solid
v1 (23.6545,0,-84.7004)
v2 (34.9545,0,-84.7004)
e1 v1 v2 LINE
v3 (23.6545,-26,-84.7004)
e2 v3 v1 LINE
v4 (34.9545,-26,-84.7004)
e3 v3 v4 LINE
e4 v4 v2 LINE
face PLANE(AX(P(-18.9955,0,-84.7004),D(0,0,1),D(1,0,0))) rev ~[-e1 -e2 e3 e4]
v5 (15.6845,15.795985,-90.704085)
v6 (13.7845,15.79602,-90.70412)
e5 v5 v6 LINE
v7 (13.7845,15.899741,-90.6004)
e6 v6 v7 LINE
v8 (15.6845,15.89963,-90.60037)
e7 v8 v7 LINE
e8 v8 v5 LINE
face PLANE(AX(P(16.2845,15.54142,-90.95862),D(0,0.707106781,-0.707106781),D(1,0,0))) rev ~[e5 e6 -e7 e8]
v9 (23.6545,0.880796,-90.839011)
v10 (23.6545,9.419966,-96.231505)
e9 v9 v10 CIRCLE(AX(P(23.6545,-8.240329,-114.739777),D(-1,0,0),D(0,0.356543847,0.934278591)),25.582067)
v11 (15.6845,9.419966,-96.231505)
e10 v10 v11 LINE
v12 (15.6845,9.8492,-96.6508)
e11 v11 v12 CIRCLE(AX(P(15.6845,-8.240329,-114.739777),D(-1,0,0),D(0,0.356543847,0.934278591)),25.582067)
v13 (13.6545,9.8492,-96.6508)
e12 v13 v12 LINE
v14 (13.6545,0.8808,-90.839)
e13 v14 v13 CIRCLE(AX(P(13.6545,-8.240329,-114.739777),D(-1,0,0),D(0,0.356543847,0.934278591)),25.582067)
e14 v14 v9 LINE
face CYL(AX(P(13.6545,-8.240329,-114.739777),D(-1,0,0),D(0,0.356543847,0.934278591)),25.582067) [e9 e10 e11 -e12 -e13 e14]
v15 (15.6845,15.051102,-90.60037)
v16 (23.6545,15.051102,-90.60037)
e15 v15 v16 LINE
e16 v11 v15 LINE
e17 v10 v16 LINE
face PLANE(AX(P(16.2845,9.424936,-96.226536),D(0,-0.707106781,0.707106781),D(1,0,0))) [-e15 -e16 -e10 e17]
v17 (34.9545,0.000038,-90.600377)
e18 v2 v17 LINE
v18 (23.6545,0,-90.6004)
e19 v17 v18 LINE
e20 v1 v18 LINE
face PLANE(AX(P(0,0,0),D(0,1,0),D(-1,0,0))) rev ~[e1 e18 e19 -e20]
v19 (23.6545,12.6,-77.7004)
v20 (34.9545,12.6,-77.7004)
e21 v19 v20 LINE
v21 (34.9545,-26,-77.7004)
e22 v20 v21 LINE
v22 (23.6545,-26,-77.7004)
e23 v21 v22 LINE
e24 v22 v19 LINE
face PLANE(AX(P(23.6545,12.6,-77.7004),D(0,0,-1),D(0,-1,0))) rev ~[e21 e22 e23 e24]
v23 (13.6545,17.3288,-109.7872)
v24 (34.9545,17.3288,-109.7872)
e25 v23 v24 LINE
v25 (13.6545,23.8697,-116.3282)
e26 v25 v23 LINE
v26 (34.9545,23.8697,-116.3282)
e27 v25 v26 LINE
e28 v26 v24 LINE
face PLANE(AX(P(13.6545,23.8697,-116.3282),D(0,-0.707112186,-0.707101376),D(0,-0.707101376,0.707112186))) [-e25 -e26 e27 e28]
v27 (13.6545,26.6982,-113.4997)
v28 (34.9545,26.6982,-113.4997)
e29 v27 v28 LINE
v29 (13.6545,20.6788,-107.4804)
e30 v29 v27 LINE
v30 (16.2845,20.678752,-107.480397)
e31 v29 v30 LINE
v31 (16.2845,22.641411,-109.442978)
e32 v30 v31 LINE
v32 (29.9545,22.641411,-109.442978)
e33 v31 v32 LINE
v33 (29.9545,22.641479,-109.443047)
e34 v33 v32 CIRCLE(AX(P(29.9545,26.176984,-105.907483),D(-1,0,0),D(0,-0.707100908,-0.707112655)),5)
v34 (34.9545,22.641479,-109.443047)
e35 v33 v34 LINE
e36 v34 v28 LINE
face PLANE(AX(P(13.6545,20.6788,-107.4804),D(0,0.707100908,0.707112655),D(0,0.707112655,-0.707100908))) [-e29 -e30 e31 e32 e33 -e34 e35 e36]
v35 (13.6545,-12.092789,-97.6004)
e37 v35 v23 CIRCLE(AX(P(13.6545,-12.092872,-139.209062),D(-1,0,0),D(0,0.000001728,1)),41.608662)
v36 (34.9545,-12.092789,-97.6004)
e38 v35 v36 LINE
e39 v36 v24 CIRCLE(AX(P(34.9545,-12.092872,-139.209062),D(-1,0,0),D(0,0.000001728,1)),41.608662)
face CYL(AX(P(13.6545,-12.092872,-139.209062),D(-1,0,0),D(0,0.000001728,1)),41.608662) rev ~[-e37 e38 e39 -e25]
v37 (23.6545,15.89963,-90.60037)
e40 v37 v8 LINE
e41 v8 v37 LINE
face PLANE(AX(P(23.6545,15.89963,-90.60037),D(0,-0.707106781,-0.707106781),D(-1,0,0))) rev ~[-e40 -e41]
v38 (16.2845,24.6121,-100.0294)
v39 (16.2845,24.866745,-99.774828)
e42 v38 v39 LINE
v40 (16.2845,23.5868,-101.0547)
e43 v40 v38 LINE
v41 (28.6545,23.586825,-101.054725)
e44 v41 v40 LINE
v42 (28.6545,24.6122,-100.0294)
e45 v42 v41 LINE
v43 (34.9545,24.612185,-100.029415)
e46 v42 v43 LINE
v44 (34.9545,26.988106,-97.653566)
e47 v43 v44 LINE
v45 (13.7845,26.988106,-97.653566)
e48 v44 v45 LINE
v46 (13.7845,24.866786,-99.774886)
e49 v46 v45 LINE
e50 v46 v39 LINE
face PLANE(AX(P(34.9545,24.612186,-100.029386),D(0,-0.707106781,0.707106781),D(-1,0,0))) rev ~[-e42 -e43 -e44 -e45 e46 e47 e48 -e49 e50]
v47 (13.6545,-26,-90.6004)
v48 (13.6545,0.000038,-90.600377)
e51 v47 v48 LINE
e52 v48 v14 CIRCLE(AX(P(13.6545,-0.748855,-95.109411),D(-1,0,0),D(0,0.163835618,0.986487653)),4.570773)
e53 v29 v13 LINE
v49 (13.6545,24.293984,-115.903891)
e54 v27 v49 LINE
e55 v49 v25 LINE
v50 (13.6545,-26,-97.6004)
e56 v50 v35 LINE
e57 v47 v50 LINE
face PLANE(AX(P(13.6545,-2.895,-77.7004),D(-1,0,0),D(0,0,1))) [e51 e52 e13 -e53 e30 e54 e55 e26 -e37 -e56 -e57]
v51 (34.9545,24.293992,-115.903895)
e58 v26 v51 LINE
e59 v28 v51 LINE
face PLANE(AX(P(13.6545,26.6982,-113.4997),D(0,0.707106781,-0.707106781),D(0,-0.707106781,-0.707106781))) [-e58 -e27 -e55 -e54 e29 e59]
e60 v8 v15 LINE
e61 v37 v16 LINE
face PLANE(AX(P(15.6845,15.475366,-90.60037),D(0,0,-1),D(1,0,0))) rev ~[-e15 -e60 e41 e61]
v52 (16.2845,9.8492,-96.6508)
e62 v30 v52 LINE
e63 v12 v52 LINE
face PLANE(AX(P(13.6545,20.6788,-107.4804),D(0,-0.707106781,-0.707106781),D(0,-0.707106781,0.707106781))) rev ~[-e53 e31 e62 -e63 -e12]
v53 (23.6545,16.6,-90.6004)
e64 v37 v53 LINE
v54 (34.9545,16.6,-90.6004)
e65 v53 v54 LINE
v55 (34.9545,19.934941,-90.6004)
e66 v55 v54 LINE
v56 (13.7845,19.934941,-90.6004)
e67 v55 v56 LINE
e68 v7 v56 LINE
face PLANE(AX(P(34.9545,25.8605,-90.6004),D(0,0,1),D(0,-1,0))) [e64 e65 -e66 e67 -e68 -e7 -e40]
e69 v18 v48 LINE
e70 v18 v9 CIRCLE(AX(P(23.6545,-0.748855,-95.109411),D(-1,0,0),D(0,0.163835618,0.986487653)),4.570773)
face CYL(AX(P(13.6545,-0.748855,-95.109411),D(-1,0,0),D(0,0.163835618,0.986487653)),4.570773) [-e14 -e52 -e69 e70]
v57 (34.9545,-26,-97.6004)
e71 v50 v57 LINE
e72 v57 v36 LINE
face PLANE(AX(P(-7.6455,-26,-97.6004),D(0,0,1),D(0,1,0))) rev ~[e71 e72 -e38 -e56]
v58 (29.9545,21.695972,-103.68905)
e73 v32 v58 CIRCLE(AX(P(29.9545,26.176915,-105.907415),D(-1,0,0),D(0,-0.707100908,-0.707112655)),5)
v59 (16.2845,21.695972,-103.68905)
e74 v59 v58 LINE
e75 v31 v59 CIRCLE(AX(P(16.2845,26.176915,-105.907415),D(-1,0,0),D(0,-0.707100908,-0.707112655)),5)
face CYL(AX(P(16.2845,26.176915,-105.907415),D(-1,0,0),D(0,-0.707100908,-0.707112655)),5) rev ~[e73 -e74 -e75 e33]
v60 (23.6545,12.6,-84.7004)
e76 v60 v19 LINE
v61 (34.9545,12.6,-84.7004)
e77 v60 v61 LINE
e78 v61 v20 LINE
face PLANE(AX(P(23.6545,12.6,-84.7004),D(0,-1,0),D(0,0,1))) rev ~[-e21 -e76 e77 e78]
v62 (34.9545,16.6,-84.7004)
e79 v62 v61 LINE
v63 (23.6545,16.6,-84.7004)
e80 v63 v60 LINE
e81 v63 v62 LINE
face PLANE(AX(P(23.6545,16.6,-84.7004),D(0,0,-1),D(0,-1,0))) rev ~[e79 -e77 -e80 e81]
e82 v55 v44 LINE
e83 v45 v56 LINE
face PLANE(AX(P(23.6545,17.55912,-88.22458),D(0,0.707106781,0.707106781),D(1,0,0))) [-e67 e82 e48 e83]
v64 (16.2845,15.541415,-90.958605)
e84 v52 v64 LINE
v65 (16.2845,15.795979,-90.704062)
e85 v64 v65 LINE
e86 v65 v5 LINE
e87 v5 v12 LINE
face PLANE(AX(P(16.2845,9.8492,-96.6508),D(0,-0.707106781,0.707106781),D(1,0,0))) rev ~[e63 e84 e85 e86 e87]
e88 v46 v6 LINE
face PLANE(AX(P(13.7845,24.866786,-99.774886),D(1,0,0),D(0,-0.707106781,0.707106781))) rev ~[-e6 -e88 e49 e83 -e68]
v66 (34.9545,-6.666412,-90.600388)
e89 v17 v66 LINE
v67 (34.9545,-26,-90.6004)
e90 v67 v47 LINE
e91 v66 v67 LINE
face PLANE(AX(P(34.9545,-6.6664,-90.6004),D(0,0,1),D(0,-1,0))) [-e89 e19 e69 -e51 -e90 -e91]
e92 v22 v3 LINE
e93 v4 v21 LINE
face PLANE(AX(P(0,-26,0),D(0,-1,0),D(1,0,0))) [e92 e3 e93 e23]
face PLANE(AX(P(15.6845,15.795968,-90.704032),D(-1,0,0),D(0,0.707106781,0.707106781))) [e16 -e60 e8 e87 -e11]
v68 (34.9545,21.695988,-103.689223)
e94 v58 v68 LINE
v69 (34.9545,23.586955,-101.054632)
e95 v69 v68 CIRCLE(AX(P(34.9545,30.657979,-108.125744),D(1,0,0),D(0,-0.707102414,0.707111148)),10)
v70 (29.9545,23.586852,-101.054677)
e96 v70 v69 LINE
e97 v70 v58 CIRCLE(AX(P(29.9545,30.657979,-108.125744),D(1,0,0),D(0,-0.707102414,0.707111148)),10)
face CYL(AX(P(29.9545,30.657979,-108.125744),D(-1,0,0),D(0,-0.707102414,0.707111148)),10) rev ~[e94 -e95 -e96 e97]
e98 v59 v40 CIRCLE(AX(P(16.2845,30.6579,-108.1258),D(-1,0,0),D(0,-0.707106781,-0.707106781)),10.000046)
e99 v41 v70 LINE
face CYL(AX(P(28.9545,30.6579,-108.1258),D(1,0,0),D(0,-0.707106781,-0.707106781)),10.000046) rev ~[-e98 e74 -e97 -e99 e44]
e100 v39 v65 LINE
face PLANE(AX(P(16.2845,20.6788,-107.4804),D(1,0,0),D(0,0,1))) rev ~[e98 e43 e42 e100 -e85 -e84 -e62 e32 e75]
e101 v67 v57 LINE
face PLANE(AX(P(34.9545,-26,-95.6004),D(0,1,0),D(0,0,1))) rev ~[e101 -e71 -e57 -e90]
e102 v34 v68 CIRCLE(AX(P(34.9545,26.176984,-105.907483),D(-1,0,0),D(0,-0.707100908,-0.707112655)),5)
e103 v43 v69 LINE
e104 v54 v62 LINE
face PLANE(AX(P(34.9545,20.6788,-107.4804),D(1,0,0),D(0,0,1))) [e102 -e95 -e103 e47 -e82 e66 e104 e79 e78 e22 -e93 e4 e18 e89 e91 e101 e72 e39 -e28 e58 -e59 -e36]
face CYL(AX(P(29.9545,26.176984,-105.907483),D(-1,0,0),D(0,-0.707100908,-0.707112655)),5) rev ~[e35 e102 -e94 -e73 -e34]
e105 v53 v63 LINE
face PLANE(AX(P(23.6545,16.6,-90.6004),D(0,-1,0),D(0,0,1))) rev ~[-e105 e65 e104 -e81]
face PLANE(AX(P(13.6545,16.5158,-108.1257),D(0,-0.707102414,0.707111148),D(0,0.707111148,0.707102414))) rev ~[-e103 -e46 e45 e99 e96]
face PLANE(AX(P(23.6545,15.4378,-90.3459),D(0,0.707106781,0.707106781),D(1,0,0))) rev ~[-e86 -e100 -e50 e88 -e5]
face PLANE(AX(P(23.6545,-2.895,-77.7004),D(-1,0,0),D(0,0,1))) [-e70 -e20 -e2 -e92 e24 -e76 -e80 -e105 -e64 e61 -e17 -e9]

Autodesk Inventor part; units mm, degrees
ref_plane "YZ Plane" through (0, 0, 0) normal (1, 0, 0) x (0, 1, 0)
ref_plane "XZ Plane" through (0, 0, 0) normal (0, 1, 0) x (-1, 0, 0)
ref_plane "XY Plane" through (0, 0, 0) normal (0, 0, 1) x (1, 0, 0)
sketch "Sketch1" plane through (0, 0, 0) normal (0, 1, 0) x (-1, 0, 0)
  line L0 (23.4955, 9.8996) -> (-50.8045, 9.8996)
  line L1 (-50.8045, 9.8996) -> (-50.8045, -84.7004)
  line L2 (-50.8045, -84.7004) -> (23.4955, -84.7004)
  line L3 (23.4955, -84.7004) -> (23.4955, 9.8996)
  line L4 (29.4455, 15.7996) -> (-56.7545, 15.7996)
  line L5 (-56.7545, 15.7996) -> (-56.7545, -90.6004)
  line L6 (-56.7545, -90.6004) -> (29.4455, -90.6004)
  line L7 (29.4455, -90.6004) -> (29.4455, 15.7996)
  line L8 (29.4455, -37.4004) -> (-56.7545, -37.4004) construction
  line L9 (-13.6545, -90.6004) -> (-13.6545, 15.7996) construction
  dimension "d0" = 94.6
  dimension "d1" = 74.3
  dimension "d2" = 106.4
  dimension "d3" = 86.2
extrude "Extrusion1" add sketch "Sketch1" along normal blind 6
fillet "Fillet1" radius 4.5 4 edges at (-23.4955, 3, 9.8996) (50.8045, 3, 9.8996) (50.8045, 3, -84.7004) (-23.4955, 3, -84.7004)
fillet "Fillet2" radius 4.5 4 edges at (56.7545, 3, 15.7996) (-29.4455, 3, 15.7996) (56.7545, 3, -90.6004) (-29.4455, 3, -90.6004)
sketch "Sketch2" plane through (0, 0, 0) normal (0, -1, 0) x (1, 0, 0)
  line L0 (50.8045, -80.2004) -> (50.8045, 5.3996) projected
  arc A0 (46.3045, -84.7004) -> (50.8045, -80.2004) centre (46.3045, -80.2004) ccw projected
  line L1 (-18.9955, -84.7004) -> (46.3045, -84.7004) projected
  arc A1 (-23.4955, -80.2004) -> (-18.9955, -84.7004) centre (-18.9955, -80.2004) ccw projected
  line L2 (-23.4955, 5.3996) -> (-23.4955, -80.2004) projected
  arc A2 (-18.9955, 9.8996) -> (-23.4955, 5.3996) centre (-18.9955, 5.3996) ccw projected
  line L3 (46.3045, 9.8996) -> (-18.9955, 9.8996) projected
  arc A3 (50.8045, 5.3996) -> (46.3045, 9.8996) centre (46.3045, 5.3996) ccw projected
  line L4 (43.8045, -77.7004) -> (-16.4955, -77.7004)
  line L5 (-16.4955, -77.7004) -> (-16.4955, 2.8996)
  line L6 (-16.4955, 2.8996) -> (43.8045, 2.8996)
  line L7 (43.8045, 2.8996) -> (43.8045, -77.7004)
  line L8 (13.6545, -84.7004) -> (13.6545, 9.8996) construction
  line L9 (46.3045, 9.8996) -> (-18.9955, 9.8996) construction
  line L10 (50.8045, -80.2004) -> (50.8045, 5.3996) construction
  line L11 (50.8045, -37.4004) -> (-23.4955, -37.4004) construction
  line L12 (56.7545, 11.2996) -> (56.7545, -86.1004) construction
  point P0 (0, 0)
  dimension "d8" = 5.95
  dimension "d9" = 7
  dimension "d10" = 7
extrude "Extrusion2" add sketch "Sketch2" along normal blind 6
fillet "Fillet3" radius 4.5 4 edges at (43.8045, -3, -77.7004) (43.8045, -3, 2.8996) (-16.4955, -3, 2.8996) (-16.4955, -3, -77.7004)
sketch "Sketch3" plane through (0, 0, 0) normal (0, 1, 0) x (1, 0, 0)
  arc A0 (46.3045, -9.8996) -> (50.8045, -5.3996) centre (46.3045, -5.3996) ccw projected
  line L0 (50.8045, 80.2004) -> (50.8045, -5.3996) projected
  arc A1 (50.8045, 80.2004) -> (46.3045, 84.7004) centre (46.3045, 80.2004) ccw projected
  line L1 (-18.9955, 84.7004) -> (46.3045, 84.7004) projected
  arc A2 (-18.9955, 84.7004) -> (-23.4955, 80.2004) centre (-18.9955, 80.2004) ccw projected
  line L2 (-23.4955, -5.3996) -> (-23.4955, 80.2004) projected
  arc A3 (-23.4955, -5.3996) -> (-18.9955, -9.8996) centre (-18.9955, -5.3996) ccw projected
  line L3 (46.3045, -9.8996) -> (-18.9955, -9.8996) projected
  arc A4 (43.8045, 73.2004) -> (39.3045, 77.7004) centre (39.3045, 73.2004) ccw projected
  line L4 (43.8045, 1.6004) -> (43.8045, 73.2004) projected
  arc A5 (39.3045, -2.8996) -> (43.8045, 1.6004) centre (39.3045, 1.6004) ccw projected
  line L5 (-11.9955, -2.8996) -> (39.3045, -2.8996) projected
  arc A6 (-16.4955, 1.6004) -> (-11.9955, -2.8996) centre (-11.9955, 1.6004) ccw projected
  line L6 (-16.4955, 73.2004) -> (-16.4955, 1.6004) projected
  arc A7 (-11.9955, 77.7004) -> (-16.4955, 73.2004) centre (-11.9955, 73.2004) ccw projected
  line L7 (39.3045, 77.7004) -> (-11.9955, 77.7004) projected
  point P0 (0, 0)
extrude "Extrusion3" add sketch "Sketch3" along normal blind 2
ref_plane "Work Plane1" through (-23.4955, 6, -84.7004) normal (0, 0.7071068, -0.7071068) x (1, 0, 0)
sketch "Sketch5" plane through (-23.4955, 6, -84.7004) normal (0, 0.7071068, -0.7071068) x (1, 0, 0)
  line L0 (4.5, 0) -> (69.8, 0) projected
  line L1 (37.15, 0) -> (37.15, -42.3796) construction
  circle A0 centre (37.15, 1.34) radius 1.34 construction
  line L2 (37.15, 1.34) -> (37.15, -18.66) construction
  line L3 (38.49, 1.34) -> (38.49, -18.66)
  line L4 (35.81, -18.66) -> (35.81, 1.34)
  arc A1 (38.49, 1.34) -> (35.81, 1.34) centre (37.15, 1.34) ccw
  arc A2 (35.81, -18.66) -> (38.49, -18.66) centre (37.15, -18.66) ccw
  point P0 (23.4955, -55.6496)
  point P1 (37.15, -8.66)
  dimension "d20" = 2.68
  dimension "d19" = 90
  dimension "d21" = 20
  dimension "d22" = 2.68
extrude "Extrusion5" cut sketch "Sketch5" along normal mid plane 51.82
sketch "Sketch6" plane through (-23.4955, 6, -84.7004) normal (0, 0.7071068, -0.7071068) x (1, 0, 0)
  arc A0 (38.49, 1.34) -> (35.81, 1.34) centre (37.15, 1.34) ccw projected
  line L0 (38.49, 0) -> (38.49, 1.34) projected
  arc A1 (38.49, 1.34) -> (35.81, 1.34) centre (37.15, 1.34) ccw projected
  line L1 (35.81, 1.34) -> (35.81, 0) projected
  line L2 (4.5, 0) -> (35.81, 0) projected
  line L3 (4.5, 2.8284) -> (4.5, 0) projected
  line L4 (4.5, 2.8284) -> (69.8, 2.8284) projected
  line L5 (69.8, 0) -> (69.8, 2.8284) projected
  line L6 (38.49, 0) -> (69.8, 0) projected
  line L7 (75.75, 8.4146) -> (-1.45, 8.4146) projected
  line L8 (74.9473, 2.68) -> (-18.0058, 2.68) construction
  line L9 (0, -55.225) -> (0, 5.3033) construction
  line L10 (90.8097, 9.1284) -> (-67.1811, 9.1284) construction
  line L11 (37.15, 2.68) -> (37.15, 37.6448) construction
  line L12 (58.45, 9.1284) -> (15.85, 9.1284)
  line L13 (15.85, 9.1284) -> (15.85, 13.1284)
  line L14 (15.85, 13.1284) -> (58.45, 13.1284)
  line L15 (58.45, 13.1284) -> (58.45, 9.1284)
  point P0 (23.4955, -55.6496)
  dimension "d25" = 6.3
  dimension "d26" = 42.6
  dimension "d27" = 4
extrude "Extrusion6" add sketch "Sketch6" along normal blind 35 contours L12 L13 L14 L15
sketch "Sketch7" plane through (-23.4955, 30.7487, -109.4492) normal (0, 0.7071068, -0.7071068) x (-1, 0, 0)
  line L0 (-15.85, -13.1284) -> (-15.85, -9.1284) projected
  line L1 (-58.45, -9.1284) -> (-58.45, -13.1284) projected
  point P0 (-23.4955, 55.6496)
  point P1 (-15.85, -11.1284)
  point P2 (-58.45, -11.1284)
  dimension "d30" = 42.6
sketch "Sketch8" plane through (34.9545, -3.2832, -93.9836) normal (1, 0, 0) x (0, 0.7071068, -0.7071068)
  line L0 (-0.0707, 4.7139) -> (-3.2527, 7.8958) projected
  line L1 (0.9899, 12.1385) -> (4.1719, 8.9565) projected
  line L2 (0, 0) -> (35, 0) projected
  line L3 (-0.0707, 4.7139) -> (-14.2134, -9.4288) construction
  line L4 (0, 4) -> (35, 4) projected
  line L5 (0, 4) -> (0, 0) projected
  line L6 (4.1719, 8.9565) -> (-4.7846, 0)
  line L7 (-4.7846, 0) -> (0, 0)
  line L8 (0, 0) -> (0, 4) projected
  line L9 (0, 0) -> (0, 4)
  line L10 (4.1719, 8.9565) -> (4.1719, 4)
  line L11 (0, 4) -> (35, 4) projected
  line L12 (4.1719, 4) -> (0, 4)
  line L13 (-0.0707, 4.7139) -> (4.1719, 8.9565) projected
  point P0 (-64.1349, 68.778)
  point P1 (4.1719, 4)
extrude "Extrusion7" add sketch "Sketch8" against normal blind 42.6
sketch "Sketch9" plane through (34.9545, -6.6664, -90.6004) normal (1, 0, 0) x (0, 0, -1)
  line L0 (0, 6.6664) -> (0, 0) projected
  line L1 (0, 0) -> (28.1319, 28.1319) projected
  line L2 (0, 0) -> (0, 6.6664) projected
  line L3 (0, 0) -> (0, -20)
  line L4 (0, -20) -> (5, -20)
  line L5 (5, -20) -> (5, 5)
  line L6 (0, 0) -> (28.1319, 28.1319) projected
  line L7 (5, 5) -> (0, 0)
  point P0 (-90.6004, 6.6664)
  point P1 (5, 5)
  dimension "d33" = 5
  dimension "d34" = 20
extrude "Extrusion8" add sketch "Sketch9" against normal blind 42.6
sketch "Sketch10" plane through (-7.6455, 24.294, -115.9039) normal (0, 0.7071068, 0.7071068) x (1, 0, 0)
  line L0 (0, -30.8281) -> (42.6, -30.8281) projected
  line L1 (42.6, -30.8281) -> (42.6, 0) projected
  line L2 (0, 0) -> (42.6, 0) projected
  line L3 (0, -30.8281) -> (0, 0) projected
  line L4 (42.6, -30.8281) -> (0, -30.8281) projected
  line L5 (0, -30.8281) -> (5, -30.8281)
  line L6 (5, -30.8281) -> (5, 0)
  line L7 (5, 0) -> (0, 0)
  line L8 (0, 0) -> (0, -30.8281)
  line L9 (42.6, 0) -> (0, 0) projected
  line L10 (37.6, 0) -> (42.6, 0)
  line L11 (42.6, 0) -> (42.6, -30.8281)
  line L12 (42.6, -30.8281) -> (37.6, -30.8281)
  line L13 (37.6, -30.8281) -> (37.6, 0)
  point P0 (7.6455, -99.1349)
  point P1 (37.6, 0)
  point P2 (37.6, -30.8281)
  dimension "d37" = 5
  dimension "d38" = 5
extrude "Extrusion9" add sketch "Sketch10" along normal blind 19 contours L3 L2 L6 L0 | L13 L2 L1 L0
sketch "Sketch11" plane through (-7.6455, 37.729, -102.4689) normal (0, 0.7071068, 0.7071068) x (1, 0, 0)
  line L0 (0, -30.8281) -> (5, -30.8281) projected
  line L1 (5, 0) -> (0, 0) projected
  point P0 (7.6455, -99.1349)
  point P1 (2.5, 0)
  point P2 (2.5, -30.8281)
  dimension "d41" = 30.8281
sketch "Sketch12" plane through (-2.6455, 2.4952, -94.1052) normal (1, 0, 0) x (0, -0.7071068, -0.7071068)
  line L0 (0, 30.8281) -> (0, 0) projected
  line L1 (0, 30.8281) -> (-19, 30.8281) projected
  line L2 (-19, 0) -> (-19, 30.8281) projected
  line L3 (-4.9565, 0) -> (-19, 0) projected
  line L4 (0, 0) -> (-4.9565, 0) projected
  line L5 (-19, 30.8281) -> (-15, 30.8281)
  line L6 (-15, 30.8281) -> (-15, 0)
  line L7 (-15, 0) -> (-19, 0)
  line L8 (-19, 0) -> (-19, 30.8281)
  point P0 (-64.778, -68.3068)
  dimension "d42" = 15
extrude "Extrusion10" add sketch "Sketch12" along normal blind 8.5 contours L6 L3 L2 L1
sketch "Sketch13" plane through (29.9545, 2.4952, -94.1052) normal (-1, 0, 0) x (0, 0.7071068, 0.7071068)
  line L0 (0, 0) -> (0, 30.8281) projected
  line L1 (4.9565, 0) -> (0, 0) projected
  line L2 (4.9565, 0) -> (19, 0) projected
  line L3 (19, 30.8281) -> (19, 0) projected
  line L4 (0, 30.8281) -> (19, 30.8281) projected
  line L5 (19, 30.8281) -> (7.45, 30.8281)
  line L6 (7.45, 30.8281) -> (7.45, 0)
  line L7 (7.45, 0) -> (19, 0)
  line L8 (19, 0) -> (19, 30.8281)
  point P0 (64.778, -68.3068)
  point P1 (7.45, 30.8281)
  dimension "d45" = 7.45
extrude "Extrusion11" add sketch "Sketch13" along normal blind 8.5 contours L4 L3 L2 L6
sketch "Sketch14" plane through (34.9545, -26.6664, -90.6004) normal (1, 0, 0) x (0, 0, -1)
  line L0 (5, 25) -> (28.1319, 48.1319) projected
  line L1 (28.1319, 48.1319) -> (11.8685, 64.3954) projected
  line L2 (-9.9303, 42.5967) -> (11.8685, 64.3954) projected
  line L3 (0, 32.6664) -> (-9.9303, 42.5967) projected
  line L4 (0, 26.6664) -> (0, 32.6664) projected
  line L5 (0, 26.6664) -> (0, 0) projected
  line L6 (0, 0) -> (5, 0) projected
  line L7 (5, 0) -> (5, 25) projected
  line L8 (0, 32.6664) -> (3.5048, 29.1616) construction
  line L9 (-9.9303, 42.5967) -> (11.8685, 64.3954) construction
  line L10 (-7.1018, 39.7682) -> (14.6969, 61.567) construction
  line L11 (0, 32.6664) -> (-1.7632, 34.4296) projected
  line L12 (0, 52.5269) -> (0, 32.6664)
  line L13 (-1.7632, 34.4296) -> (-9.9303, 42.5967) projected
  line L14 (0, 32.6664) -> (-9.9303, 42.5967)
  line L15 (-9.9303, 42.5967) -> (0, 52.5269)
  point P0 (-90.6004, 26.6664)
  point P1 (11.8685, 64.3954)
  point P2 (0, 52.5269)
extrude "Extrusion12" cut sketch "Sketch14" against normal blind 100 contours L12 L3 L2
sketch "Sketch15" plane through (-23.4955, 30.7487, -109.4492) normal (0, 0.7071068, -0.7071068) x (-1, 0, 0)
  line L0 (-58.45, -13.1284) -> (-15.85, -13.1284) projected
  line L1 (-15.85, -13.1284) -> (-15.85, 9.8716) projected
  line L2 (-15.85, 9.8716) -> (-29.35, 9.8716) projected
  line L3 (-29.35, 5.8716) -> (-29.35, 9.8716) projected
  line L4 (-20.85, 5.8716) -> (-29.35, 5.8716) projected
  line L5 (-20.85, -9.1284) -> (-20.85, 5.8716) projected
  line L6 (-20.85, -9.1284) -> (-53.45, -9.1284) projected
  line L7 (-53.45, -9.1284) -> (-53.45, -1.6784) projected
  line L8 (-53.45, -1.6784) -> (-44.95, -1.6784) projected
  line L9 (-44.95, 9.8716) -> (-44.95, -1.6784) projected
  line L10 (-58.45, 9.8716) -> (-44.95, 9.8716) projected
  line L11 (-58.45, -13.1284) -> (-58.45, 9.8716) projected
  line L12 (-58.45, 9.8716) -> (-44.95, 9.8716)
  line L13 (-44.95, 9.8716) -> (-44.95, 2.3216)
  line L14 (-44.95, 2.3216) -> (-58.45, 2.3216)
  line L15 (-58.45, 2.3216) -> (-58.45, 9.8716)
  point P0 (-23.4955, 55.6496)
  point P1 (-51.7, 2.3216)
  point P2 (-58.45, 2.3216)
  dimension "d52" = 4
extrude "Extrusion13" cut sketch "Sketch15" against normal blind 100 contours L11 L10 L9 L14
sketch "Sketch16" plane through (-2.6455, 24.294, -115.9039) normal (0, 0.7071068, 0.7071068) x (1, 0, 0)
  line L0 (32.6, -30.8281) -> (0, -30.8281) projected
  line L1 (8.5, -20.7846) -> (0, -20.7846) projected
  point P0 (2.6455, -99.1349)
  dimension "d55" = 10.0435
sketch "Sketch17" plane through (-2.6455, 6, -90.6004) normal (1, 0, 0) x (0, 0, -1)
  line L0 (0, 14.2037) -> (0, 0) projected
  line L1 (3.5048, -3.5048) -> (0, 0) projected
  line L2 (25.3035, 18.294) -> (3.5048, -3.5048) projected
  line L3 (25.3035, 18.294) -> (14.6969, 28.9006) projected
  line L4 (14.6969, 28.9006) -> (0, 14.2037) projected
  line L5 (5.6261, -1.3835) -> (3.5048, -3.5048)
  line L6 (3.5048, -3.5048) -> (0, 0)
  line L7 (0, 0) -> (2.1213, 2.1213)
  line L8 (2.1213, 2.1213) -> (5.6261, -1.3835)
  point P0 (-90.6004, -6)
  dimension "d56" = 3
extrude "Extrusion14" add sketch "Sketch17" along normal blind 34.75 contours L7 L8 L2 L1
sketch "Sketch18" plane through (0, -6, 0) normal (0, -1, 0) x (1, 0, 0)
  line L0 (-18.9955, -84.7004) -> (46.3045, -84.7004) projected
  line L1 (39.3045, -77.7004) -> (-11.9955, -77.7004) projected
  line L2 (-7.6455, -95.6004) -> (-7.6455, -90.6004) projected
  line L3 (34.9545, -90.6004) -> (34.9545, -95.6004) projected
  line L4 (-18.9955, -84.7004) -> (46.3045, -84.7004) projected
  line L5 (-7.6455, -84.7004) -> (34.9545, -84.7004)
  line L6 (34.9545, -84.7004) -> (34.9545, -77.7004)
  line L7 (34.9545, -77.7004) -> (-7.6455, -77.7004)
  line L8 (-7.6455, -77.7004) -> (-7.6455, -84.7004)
  point P0 (0, 0)
extrude "Extrusion15" add sketch "Sketch18" along normal blind 20
fillet "Fillet5" radius 5 2 edges at (5.8545, 36.3148, -103.8831) (21.4545, 30.9761, -109.2218)
sketch "Sketch19" plane through (0, -6, 0) normal (0, -1, 0) x (1, 0, 0)
  line L0 (34.9545, -118.7324) -> (-7.6455, -118.7324) projected
  line L1 (34.9545, -95.6004) -> (34.9545, -118.7324) projected
  line L2 (34.9545, -77.7004) -> (-7.6455, -77.7004) projected
  line L3 (34.9545, -84.7004) -> (34.9545, -77.7004) projected
  line L4 (-7.6455, -77.7004) -> (-7.6455, -84.7004) projected
  line L5 (-7.6455, -95.6004) -> (-7.6455, -118.7324) projected
  line L6 (34.9545, -118.7324) -> (-7.6455, -118.7324)
  line L7 (-7.6455, -118.7324) -> (-7.6455, -77.7004)
  line L8 (-7.6455, -77.7004) -> (34.9545, -77.7004)
  line L9 (34.9545, -77.7004) -> (34.9545, -118.7324)
  point P0 (0, 0)
  point P1 (34.9545, -84.7004)
  point P2 (-7.6455, -84.7004)
extrude "Extrusion16" cut sketch "Sketch19" along normal mid plane 100 keep common part
sketch "Sketch20" plane through (34.9545, 2, -77.7004) normal (1, 0, 0) x (0, 0, -1)
  line L0 (7, -28) -> (0, -28) projected
  line L1 (7, -2) -> (7, -28) construction
  line L2 (7, -28) -> (31.0161, -28) construction
  line L3 (17.9, -28.6664) -> (12.9, -28.6664) projected
  line L4 (12.9, -28.6664) -> (17.9, -28.6664)
  line L5 (17.9, -28.6664) -> (17.9, -28)
  line L6 (17.9, -28) -> (12.9, -28)
  line L7 (12.9, -28) -> (12.9, -28.6664)
  point P0 (-77.7004, -2)
  point P1 (17.9, -28.6664)
extrude "Extrusion17" cut sketch "Sketch20" against normal blind 100
sketch "Sketch21" plane through (0, 6, 0) normal (0, 1, 0) x (1, 0, 0)
  line L0 (-7.6455, 84.7004) -> (-7.6455, 90.6004) projected
  line L1 (-7.6455, 84.7004) -> (12.3145, 84.7004) projected
  line L2 (12.3145, 84.7004) -> (12.3145, 86.5955) projected
  ellipse E0 centre (13.6545, 86.5955) end of major axis (13.6545, 88.4905) minor radius 1.34 (14.9945, 86.5955) -> (12.3145, 86.5955) ccw projected
  line L3 (14.9945, 86.5955) -> (14.9945, 84.7004) projected
  line L4 (14.9945, 84.7004) -> (34.9545, 84.7004) projected
  line L5 (34.9545, 90.6004) -> (34.9545, 84.7004) projected
  line L6 (34.9545, 90.6004) -> (29.9545, 90.6004) projected
  line L7 (29.9545, 90.6004) -> (-2.6455, 90.6004) projected
  line L8 (-2.6455, 90.6004) -> (-7.6455, 90.6004) projected
  point P0 (0, 0)
extrude "Extrusion18" add sketch "Sketch21" along normal blind 5
sketch "Sketch22" plane through (0, 2, 0) normal (0, 1, 0) x (1, 0, 0)
  line L0 (-7.6455, 77.7004) -> (-7.6455, 84.7004) projected
  line L1 (-7.6455, 77.7004) -> (12.3145, 77.7004) projected
  line L2 (12.3145, 77.7004) -> (12.3145, 82.5955) projected
  ellipse E0 centre (13.6545, 82.5955) end of major axis (13.6545, 84.4905) minor radius 1.34 (14.9945, 82.5955) -> (12.3145, 82.5955) ccw projected
  line L3 (14.9945, 82.5955) -> (14.9945, 77.7004) projected
  line L4 (14.9945, 77.7004) -> (34.9545, 77.7004) projected
  line L5 (34.9545, 84.7004) -> (34.9545, 77.7004) projected
  line L6 (-7.6455, 84.7004) -> (34.9545, 84.7004) projected
  point P0 (0, 0)
extrude "Extrusion19" add sketch "Sketch22" along normal blind 5
sketch "Sketch23" plane through (-23.4955, 6, -84.7004) normal (0, 0.7071068, -0.7071068) x (1, 0, 0)
  arc A0 (38.49, 1.34) -> (35.81, 1.34) centre (37.15, 1.34) ccw projected
  line L0 (37.15, 1.34) -> (37.15, -18.66) construction
  line L1 (35.81, 1.34) -> (35.81, -18.66)
  line L2 (38.49, -18.66) -> (38.49, 1.34)
  arc A1 (38.49, 1.34) -> (35.81, 1.34) centre (37.15, 1.34) ccw
  arc A2 (35.81, -18.66) -> (38.49, -18.66) centre (37.15, -18.66) ccw
  point P0 (23.4955, -55.6496)
  point P1 (37.15, -8.66)
  dimension "d70" = 20
extrude "Extrusion20" cut sketch "Sketch23" along normal mid plane 100
sketch "Sketch24" plane through (-2.6455, 11, -90.6004) normal (1, 0, 0) x (0, 0, -1)
  line L0 (2.1213, -2.8787) -> (5.6261, -6.3835) projected
  line L1 (25.3035, 13.294) -> (5.6261, -6.3835) projected
  line L2 (25.3035, 13.294) -> (14.6969, 23.9006) projected
  line L3 (14.6969, 23.9006) -> (0, 9.2037) projected
  line L4 (0, 9.2037) -> (0, 0) projected
  line L5 (0, 0) -> (0, -5) projected
  line L6 (0, -5) -> (2.1213, -2.8787) projected
  line L7 (0, -0.7574) -> (2.1213, -2.8787)
  line L8 (0, -0.7574) -> (0, -5)
  line L9 (0, -11) -> (-5.9, -11) projected
  line L10 (0, -5) -> (2.1213, -2.8787)
  point P0 (-90.6004, -11)
extrude "Extrusion21" add sketch "Sketch24" along normal blind 33.25 contours L6 L5 L7
sketch "Sketch25" plane through (-23.4955, 6, -84.7004) normal (0, 0.7071068, -0.7071068) x (1, 0, 0)
  line L0 (35.81, 1.34) -> (35.81, -5.6569) projected
  line L1 (38.49, -5.6569) -> (38.49, 1.34) projected
  arc A0 (38.49, 1.34) -> (35.81, 1.34) centre (37.15, 1.34) ccw projected
  line L2 (37.15, 1.34) -> (37.15, -8.66) construction
  line L3 (35.81, 1.34) -> (35.81, -8.66)
  line L4 (38.49, -8.66) -> (38.49, 1.34)
  arc A1 (38.49, 1.34) -> (35.81, 1.34) centre (37.15, 1.34) ccw
  arc A2 (35.81, -8.66) -> (38.49, -8.66) centre (37.15, -8.66) ccw
  point P0 (23.4955, -55.6496)
  point P1 (37.15, -3.66)
  dimension "d75" = 10
extrude "Extrusion22" cut sketch "Sketch25" along normal mid plane 33.25
fillet "Fillet6" radius 1 2 edges at (2.3345, 11, -84.7004) (24.9745, 11, -84.7004)
fillet "Fillet7" radius 1 8 edges at (12.3145, 10.7071, -84.9933) (12.3145, 8.5, -84.7004) (12.3145, 11, -88.1504) (14.9945, 10.7071, -84.9933) (14.9945, 8.5, -84.7004) (14.9945, 11, -88.1504) (14.9945, 7, -81.2004) (12.3145, 7, -81.2004)
sketch "Sketch26" plane through (-7.6455, 0, -90.6004) normal (-1, 0, 0) x (0, 0, 1)
  line L0 (5.9, 0) -> (5.9, -26) projected
  line L1 (12.9, -26) -> (12.9, 7) projected
  line L2 (-5, -1.6664) -> (-5, -26) projected
  line L3 (0, -26) -> (0, 0) projected
  line L4 (-5, -26) -> (0, -26) projected
  line L5 (-5, -1.6664) -> (-28.1319, 21.4655) projected
  line L6 (-5, -26) -> (-5, -1.6664) projected
  line L7 (-5, -26) -> (-7, -26)
  line L8 (-7, -26) -> (-7, 0.3336)
  line L9 (-5, -1.6664) -> (-28.1319, 21.4655) projected
  line L10 (-7, 0.3336) -> (-5, -1.6664)
  line L11 (-5, -1.6664) -> (-5, -26)
  point P0 (90.6004, 0)
  point P1 (-7, 0.3336)
  dimension "d80" = 7
  dimension "d81" = 5
  dimension "d82" = 2
sketch "Sketch27" plane through (0, -26, 0) normal (0, -1, 0) x (1, 0, 0)
  line L0 (-7.6455, -77.7004) -> (-7.6455, -84.7004) projected
  line L1 (34.9545, -84.7004) -> (34.9545, -77.7004) projected
  point P0 (0, 0)
  point P1 (-7.6455, -81.2004)
  point P2 (34.9545, -81.2004)
  dimension "d83" = 42.6
extrude "Extrusion23" add sketch "Sketch26" against normal blind 42.6
fillet "Fillet8" radius 30 1 edges at (13.6545, 0.3336, -97.6004)
ref_plane "Work Plane2" through (13.6545, -2.895, -77.7004) normal (1, 0, 0) x (0, 0, -1)
sketch "Sketch28" plane through (13.6545, -2.895, -77.7004) normal (1, 0, 0) x (0, 0, -1)
  line L0 (45.7087, -33.5387) -> (-16.3366, -33.5387)
  line L1 (-16.3366, -33.5387) -> (-16.3366, 45.9991)
  line L2 (-16.3366, 45.9991) -> (45.7087, 45.9991)
  line L3 (45.7087, 45.9991) -> (45.7087, -33.5387)
  point P0 (-77.7004, 2.895)
extrude "Extrusion24" cut sketch "Sketch28" against normal blind 100
sketch "Sketch29" plane through (13.6545, -2.895, -77.7004) normal (-1, 0, 0) x (0, 0, 1)
  line L0 (-38.2035, 27.189) -> (-18.5261, 7.5116) projected
  line L1 (-30.1071, 35.2854) -> (-32.9356, 32.457) projected
  line L2 (-30.1071, 35.2854) -> (-26.5716, 31.7498) projected
  line L3 (-12.9, 18.0782) -> (-26.5716, 31.7498) projected
  line L4 (-18.5261, 7.5116) -> (-38.2035, 27.189) projected
  line L5 (-30.1071, 35.2854) -> (-38.2035, 27.189)
  line L6 (-38.2035, 27.189) -> (-30.4253, 19.4108)
  line L7 (-30.4253, 19.4108) -> (-22.329, 27.5072)
  line L8 (-22.329, 27.5072) -> (-30.1071, 35.2854)
  point P0 (77.7004, 2.895)
  dimension "d92" = 11
extrude "Extrusion25" cut sketch "Sketch29" against normal blind 100
sketch "Sketch30" plane through (13.6545, -2.895, -77.7004) normal (-1, 0, 0) x (0, 0, 1)
  line L0 (-13.9664, 12.0713) -> (0, -1.895) projected
  line L1 (-13.9664, 12.0713) -> (-13.0897, 12.948) projected
  line L2 (-12.9, 13.895) -> (-12.9, 18.0782) projected
  line L3 (0, 0) -> (0, -1.895) projected
  line L4 (0, 8.895) -> (0, 0) projected
  line L5 (0, 9.895) -> (-7, 9.895) projected
  line L6 (0, 9.895) -> (0, 8.895) projected
  line L7 (-8, 13.895) -> (-12.895, 13.895) projected
  arc A0 (-7, 12.895) -> (-8, 13.895) centre (-8, 12.895) ccw projected
  line L8 (-7, 9.895) -> (-7, 12.895) projected
  line L9 (-12.9, 13.1377) -> (-13.0897, 12.948) projected
  line L10 (-12.9, 13.895) -> (-12.9, 13.1377) projected
  line L11 (-12.9, 13.1377) -> (-12.9, 13.895) projected
  line L12 (-13.9664, 12.0713) -> (-12.9, 13.1377)
  line L13 (-12.9, 18.0782) -> (-12.9, 13.895) projected
  line L14 (-12.9, 13.1377) -> (-12.9, 18.0782)
  line L15 (-12.9, 18.0782) -> (0, 18.0782)
  line L16 (0, 18.0782) -> (0, -1.895)
  line L17 (0, -1.895) -> (-13.9664, 12.0713)
  point P0 (77.7004, 2.895)
extrude "Extrusion26" cut sketch "Sketch30" against normal blind 10
sketch "Sketch31" plane through (13.6545, -2.895, -77.7004) normal (-1, 0, 0) x (0, 0, 1)
  line L0 (-18.5261, 7.5116) -> (-13.9664, 12.0713) projected
  line L1 (-38.2035, 27.189) -> (-18.5261, 7.5116) projected
  line L2 (-18.5261, 7.5116) -> (-13.2581, 12.7795) projected
  line L3 (-13.9664, 12.0713) -> (-18.5261, 7.5116)
  line L4 (-18.5261, 7.5116) -> (-19.9403, 8.9258)
  line L5 (-19.9403, 8.9258) -> (-15.3806, 13.4855)
  line L6 (-15.3806, 13.4855) -> (-13.9664, 12.0713)
  line L7 (-13.9664, 12.0713) -> (0, -1.895) projected
  point P0 (77.7004, 2.895)
  dimension "d97" = 2
extrude "Extrusion27" add sketch "Sketch31" against normal blind 17
sketch "Sketch32" plane through (29.9545, 9.8845, -90.9586) normal (-1, 0, 0) x (0, 0.7071068, 0.7071068)
  line L0 (-1.0016, 2) -> (-7.45, 2) projected
  line L1 (-7.45, 27.8281) -> (-7.45, 2) projected
  line L2 (0, 16.8281) -> (0, 0) projected
  line L3 (0, 0) -> (0, 16.8281) projected
  line L4 (-7.45, 2) -> (0, 2)
  line L5 (0, 2) -> (0, 6.4)
  line L6 (0, 6.4) -> (-7.45, 6.4)
  line L7 (-7.45, 6.4) -> (-7.45, 2)
  point P0 (57.328, -71.3068)
  point P1 (0, 6.4)
  point P2 (-7.45, 6.4)
  point P3 (-1.0016, 2)
  point P4 (0, 2)
  dimension "d100" = 4.4
extrude "Extrusion28" add sketch "Sketch32" along normal blind 3.6
sketch "Sketch33" plane through (21.4545, 15.1832, -90.6004) normal (0, 0.7071068, 0.7071068) x (1, 0, 0)
  line L0 (8.5, 2.9065) -> (8.5, 13.3346) projected
  line L1 (0, 13.3346) -> (0, -3.4935) projected
  line L2 (0, -3.4935) -> (0, 0) projected
  line L3 (0, 0) -> (0, 13.3346) projected
  line L4 (8.5, 13.3346) -> (0, 13.3346)
  line L5 (0, 13.3346) -> (0, -2.958)
  line L6 (0, -2.958) -> (8.5, -2.958)
  line L7 (8.5, -2.958) -> (8.5, 13.3346)
  line L8 (2.2, -2.958) -> (13.5, -2.958) projected
  line L9 (0, 13.3346) -> (1.5, 13.3346)
  line L10 (1.5, 13.3346) -> (1.5, -2.958)
  line L11 (1.5, -2.958) -> (0, -2.958)
  line L12 (0, -2.958) -> (0, 13.3346)
  point P0 (-21.4545, -74.8003)
  point P1 (13.5, 13.3346)
  point P2 (13.5, 0)
  point P3 (1.5, -2.958)
  point P4 (1.5, 13.3346)
  point P5 (0, 13.3346)
  point P6 (0, -2.958)
  dimension "d103" = 7
extrude "Extrusion29" cut sketch "Sketch33" against normal blind 4.35 contours L10 L6 L1 L4
sketch "Sketch34" plane through (13.6545, -2.895, -77.7004) normal (-1, 0, 0) x (0, 0, 1)
  line L0 (-15.3806, 13.4855) -> (-19.9403, 8.9258) projected
  line L1 (-15.3806, 13.4855) -> (0, -1.895) projected
  line L2 (-38.2035, 27.189) -> (-19.9403, 8.9258) projected
  line L3 (-15.3806, 13.4855) -> (-19.9403, 8.9258)
  line L4 (-19.9403, 8.9258) -> (-18.1725, 7.158)
  line L5 (-18.1725, 7.158) -> (-13.6128, 11.7178)
  line L6 (-13.6128, 11.7178) -> (-15.3806, 13.4855)
  point P0 (77.7004, 2.895)
  point P1 (-13.6128, 11.7178)
  dimension "d106" = 2.5
extrude "Extrusion30" cut sketch "Sketch34" against normal blind 10
sketch "Sketch35" plane through (22.9545, 15.1832, -90.6004) normal (0, 0.7071068, 0.7071068) x (1, 0, 0)
  line L0 (12, 13.3346) -> (0, 13.3346) projected
  line L1 (0.7, -2.958) -> (0.7, -6.4228) projected
  line L2 (0.7, -6.4228) -> (0.7, 13.3346)
  line L3 (0.7, 13.3346) -> (-4.3, 13.3346)
  line L4 (-4.3, 13.3346) -> (-4.3, -6.4228)
  line L5 (-4.3, -6.4228) -> (0.7, -6.4228)
  point P0 (-22.9545, -74.8003)
  point P1 (0.7, -2.958)
  point P2 (0, 13.3346)
  dimension "d109" = 5
extrude "Extrusion31" cut sketch "Sketch35" against normal blind 4.5
sketch "Sketch36" plane through (23.6545, -2.895, -77.7004) normal (-1, 0, 0) x (0, 0, 1)
  line L0 (-14.6724, 14.1938) -> (-15.3806, 13.4855) projected
  line L1 (-15.3806, 13.4855) -> (-13.9664, 12.0713) projected
  line L2 (-13.9664, 12.0713) -> (-13.2581, 12.7795) projected
  line L3 (-13.2581, 12.7795) -> (-14.6724, 14.1938) projected
  point P0 (77.7004, 2.895)
extrude "Extrusion32" add sketch "Sketch36" against normal blind 10.75
sketch "Sketch37" plane through (13.6545, -2.895, -77.7004) normal (-1, 0, 0) x (0, 0, 1)
  line L0 (-13.6128, 11.7178) -> (0, -1.895) projected
  line L1 (-13.6128, 11.7178) -> (-18.1725, 7.158) projected
  line L2 (-13.6128, 11.7178) -> (-18.1725, 7.158) projected
  line L3 (-16.7948, 8.5358) -> (-14.6735, 6.4145)
  arc A0 (-3.6254, 1.7304) -> (-14.6735, 6.4145) centre (-14.9391, -9.5833) ccw
  line L4 (0, -1.895) -> (-13.6128, 11.7178) projected
  line L5 (-16.7948, 8.5358) -> (-13.6128, 11.7178)
  line L6 (-13.6128, 11.7178) -> (-3.6254, 1.7304)
  point P0 (77.7004, 2.895)
  point P1 (-16.7948, 8.5358)
  dimension "d114" = 16
  dimension "d115" = 3
  dimension "d116" = 4.5
extrude "Extrusion33" cut sketch "Sketch37" against normal blind 10
fillet "Fillet9" radius 10 1 edges at (18.6545, -4.7901, -77.7004)
fillet "Fillet10" radius 5 1 edges at (23.6545, 23.1979, -101.4436)
fillet "Fillet11" radius 10 1 edges at (32.4545, 16.5158, -108.1258)
sketch "Sketch38" plane through (29.9545, 30.6579, -108.1258) normal (-1, 0, 0) x (0, 0, 1)
  line L0 (7.3738, -21.5159) -> (12.6417, -16.2479) projected
  line L1 (12.6417, -16.2479) -> (5.2679, -8.8742) projected
  line L2 (7.0711, -7.0711) -> (5.2679, -8.8742) projected
  arc A0 (-7.0711, -7.0711) -> (7.0711, -7.0711) centre (0, 0) ccw projected
  line L3 (7.3738, -21.5159) -> (-7.0711, -7.0711) projected
  point P0 (108.1258, -30.6579)
extrude "Extrusion34" add sketch "Sketch38" along normal blind 1
sketch "Sketch39" plane through (28.9545, 9.142, -100.752) normal (0, 0.7071068, -0.7071068) x (-1, 0, 0)
  line L0 (0, 7.45) -> (0, 0) projected
  line L1 (2.6, 0) -> (0, 0) projected
  line L2 (2.6, 7.45) -> (2.6, 0) projected
  line L3 (0, 7.45) -> (2.6, 7.45) projected
  point P0 (28.9545, 64.778)
extrude "Extrusion35" add sketch "Sketch39" along normal blind 2
sketch "Sketch40" plane through (13.6545, -2.895, -77.7004) normal (-1, 0, 0) x (0, 0, 1)
  line L0 (-16.7948, 8.5358) -> (-18.1725, 7.158) projected
  line L1 (-14.6735, 6.4145) -> (-16.7948, 8.5358) projected
  arc A0 (-18.1725, 7.158) -> (-14.6735, 6.4145) centre (-14.5185, 15.7485) ccw
  arc A1 (-3.6254, 1.7304) -> (-14.6735, 6.4145) centre (-14.9391, -9.5833) ccw projected
  point P0 (77.7004, 2.895)
extrude "Extrusion36" cut sketch "Sketch40" against normal blind 10
sketch "Sketch41" plane through (26.3545, 11.2987, -92.3728) normal (0, -0.7071068, -0.7071068) x (-1, 0, 0)
  line L0 (0, 6.4) -> (0, 0) projected
  line L1 (0, 0) -> (2.7, 0) projected
  line L2 (2.7, 0) -> (2.7, 9.8281) projected
  arc A0 (2.7, 9.8281) -> (-2.3, 14.8281) centre (-2.3, 9.8281) ccw projected
  line L3 (-2.3, 14.8281) -> (-2.6, 14.8281) projected
  line L4 (-2.6, 14.8281) -> (-2.6, 6.4) projected
  line L5 (-2.6, 6.4) -> (0, 6.4) projected
  point P0 (26.3545, -73.3068)
extrude "Extrusion37" add sketch "Sketch41" along normal blind 0.78
sketch "Sketch43" plane through (26.3545, 10.7472, -92.9243) normal (0, -0.7071068, -0.7071068) x (-1, 0, 0)
  line L0 (2.7, 0) -> (0, 0) projected
  line L1 (2.7, 0) -> (2.7, 9.8281) projected
  arc A0 (2.7, 9.8281) -> (-2.3, 14.8281) centre (-2.3, 9.8281) ccw projected
  line L2 (-2.3, 14.8281) -> (-2.6, 14.8281) projected
  line L3 (-2.6, 6.4) -> (-2.6, 14.8281) projected
  line L4 (0, 6.4) -> (-2.6, 6.4) projected
  line L5 (0, 0) -> (0, 6.4) projected
  point P0 (26.3545, -73.3068)
extrude "Extrusion39" cut sketch "Sketch43" against normal blind 0.6
sketch "Sketch44" plane through (13.6545, -2.895, -77.7004) normal (-1, 0, 0) x (0, 0, 1)
  arc A0 (-18.1725, 7.158) -> (-14.6735, 6.4145) centre (-14.5185, 15.7485) ccw projected
  line L0 (-38.2035, 27.189) -> (-18.1725, 7.158) projected
  line L1 (-41.0319, 24.3606) -> (-38.2035, 27.189) projected
  line L2 (-28.6868, 12.0154) -> (-41.0319, 24.3606) projected
  arc A1 (-19.9, -9.1978) -> (-28.6868, 12.0154) centre (-49.9, -9.1978) ccw projected
  line L3 (-19.9, -23.105) -> (-19.9, -9.1978) projected
  line L4 (-12.9, -23.105) -> (-19.9, -23.105) projected
  line L5 (-12.9, 2.895) -> (-12.9, -23.105) projected
  line L6 (-7, 2.895) -> (-12.9, 2.895) projected
  line L7 (-7, -23.105) -> (-7, 2.895) projected
  line L8 (0, -23.105) -> (-7, -23.105) projected
  line L9 (0, -6.0372) -> (0, -23.105) projected
  arc A2 (0, -6.0372) -> (-2.9289, 1.0339) centre (-10, -6.0372) ccw projected
  line L10 (-3.6254, 1.7304) -> (-2.9289, 1.0339) projected
  arc A3 (-3.6254, 1.7304) -> (-14.6735, 6.4145) centre (-14.9391, -9.5833) ccw projected
  arc A4 (-12.9, 2.895) -> (-16.459, 6.6171) centre (-17.4091, 2.1461) ccw
  point P0 (77.7004, 2.895)
extrude "Extrusion40" cut sketch "Sketch44" against normal blind 10 contours A0 A3 L10 A2 L9 L8 L7 L6 A4
sketch "Sketch45" plane through (28.9545, 30.6579, -108.1258) normal (-1, 0, 0) x (0, 0, 1)
  arc A0 (-7.0711, -7.0711) -> (7.0711, -7.0711) centre (0, 0) ccw projected
  line L0 (-7.7782, -6.364) -> (-7.0711, -7.0711) projected
  line L1 (7.0711, -7.0711) -> (8.0964, -6.0458) projected
  line L2 (5.9595, -20.1017) -> (-7.0711, -7.0711) projected
  line L3 (17.5253, -15.4747) -> (17.5253, -19.6579) projected
  line L4 (11.6319, -9.5813) -> (17.5253, -15.4747) projected
  line L5 (-7.7782, -6.364) -> (12.2528, -26.3949) projected
  line L6 (15.6257, -19.4865) -> (10.485, -24.6272) projected
  line L7 (10.485, -24.6272) -> (17.5253, -17.5869)
  line L8 (17.5253, -15.4747) -> (17.5253, -19.6579) projected
  line L9 (17.5253, -17.5869) -> (17.5253, -15.4747)
  line L10 (8.0964, -6.0458) -> (17.5253, -15.4747) projected
  line L11 (17.5253, -15.4747) -> (8.0964, -6.0458)
  line L12 (0.7071, -14.8492) -> (8.8035, -6.7529)
  line L13 (-10.6066, -9.1924) -> (-7.7782, -6.364) projected
  point P0 (108.1258, -30.6579)
  point P1 (0.7071, -14.8492)
  point P2 (8.8035, -6.7529)
  dimension "d139" = 12
extrude "Extrusion41" add sketch "Sketch45" along normal blind 12.67 contours A0 L1 L10 L12 L2
sketch "Sketch46" plane through (13.6545, 24.294, -115.9039) normal (0, 0.7071068, 0.7071068) x (1, 0, 0)
  line L0 (2.63, -1) -> (21.3, -1) projected
  line L1 (21.3, 0) -> (21.3, -1) projected
  line L2 (0, 0) -> (21.3, 0) projected
  line L3 (0, 0) -> (0, -28.3281) projected
  line L4 (0, -28.3281) -> (10, -28.3281) projected
  line L5 (10, -28.3281) -> (10, -25.8281) projected
  line L6 (10, -25.8281) -> (12.7, -25.8281) projected
  line L7 (12.7, -25.8281) -> (12.7, -19.4281) projected
  line L8 (12.7, -19.4281) -> (15.3, -19.4281) projected
  line L9 (15.3, -19.4281) -> (15.3, -12) projected
  line L10 (15.3, -12) -> (2.63, -12) projected
  line L11 (2.63, -12) -> (2.63, -1) projected
  point P0 (-13.6545, -99.1349)
  dimension "d142" = 2.7
  dimension "d143" = 5.3
sketch "Sketch47" plane through (28.9545, 30.6579, -108.1258) normal (-1, 0, 0) x (0, 0, 1)
  line L0 (0.7071, -14.8492) -> (8.8035, -6.7529) projected
  line L1 (8.8035, -6.7529) -> (11.6319, -9.5813) projected
  line L2 (11.6319, -9.5813) -> (17.5253, -15.4747) projected
  line L3 (17.5253, -15.4747) -> (17.5253, -19.6579) projected
  line L4 (15.6257, -19.4865) -> (10.485, -24.6272) projected
  line L5 (8.8035, -6.7529) -> (8.0964, -6.0458) projected
  line L6 (17.5253, -15.4747) -> (17.5253, -19.6579) projected
  line L7 (8.8035, -6.7529) -> (17.5253, -15.4747)
  line L8 (17.5253, -15.4747) -> (17.5253, -17.5663)
  line L9 (8.6762, -12.537) -> (15.6257, -19.4865) projected
  line L10 (15.6257, -19.4865) -> (17.5253, -17.5663)
  line L11 (12.2528, -26.3949) -> (10.485, -24.6272) projected
  line L12 (15.6257, -19.4865) -> (10.485, -24.6272)
  line L13 (5.9595, -20.1017) -> (0.7071, -14.8492) projected
  line L14 (10.485, -24.6272) -> (0.7071, -14.8492)
  line L15 (8.8035, -6.7529) -> (5.8478, -9.7086) projected
  line L16 (0.7071, -14.8492) -> (8.8035, -6.7529)
  point P0 (108.1258, -30.6579)
extrude "Extrusion42" add sketch "Sketch47" along normal blind 5.3
sketch "Sketch48" plane through (13.6545, -2.895, -77.7004) normal (-1, 0, 0) x (0, 0, 1)
  line L0 (-38.2035, 27.189) -> (-18.1725, 7.158) construction
  line L1 (-28.6868, 12.0154) -> (-41.0319, 24.3606) construction
  line L2 (-39.7226, 33.5164) -> (-7.5251, 1.3189) construction
  arc A0 (-37.4964, 26.4819) -> (-23.3543, 26.4819) centre (-30.4253, 33.553) ccw projected
  line L3 (-41.0319, 24.3606) -> (-38.2035, 27.189) projected
  line L4 (-37.4964, 26.4819) -> (-38.2035, 27.189)
  line L5 (-1.3113, 30.3833) -> (-32.1463, -0.4516) construction
  arc A1 (-12.9, 2.895) -> (-16.459, 6.6171) centre (-17.4091, 2.1461) ccw projected
  arc A2 (-13.1386, 3.7758) -> (-18.9504, 12.7442) centre (-37.0407, -5.346) ccw
  line L6 (-29.78, 23.5738) -> (-18.9504, 12.7442)
  arc A3 (-37.4964, 26.4819) -> (-29.78, 23.5738) centre (-30.4253, 33.553) ccw
  arc A4 (-18.1725, 7.158) -> (-16.459, 6.6171) centre (-14.5185, 15.7485) ccw projected
  arc A5 (-13.1386, 3.7758) -> (-16.459, 6.6171) centre (-17.4091, 2.1461) ccw
  arc A6 (-18.1725, 7.158) -> (-16.459, 6.6171) centre (-14.5185, 15.7485) ccw
  line L7 (-18.1725, 7.158) -> (-38.2035, 27.189)
  point P0 (77.7004, 2.895)
  point P1 (-37.4964, 26.4819)
  dimension "d146" = 7.4
  dimension "d147" = 23.828
extrude "Extrusion43" add sketch "Sketch48" against normal blind 15
sketch "Sketch49" plane through (23.6545, -2.895, -77.7004) normal (-1, 0, 0) x (0, 0, 1)
  line L0 (-18.9504, 12.7442) -> (-29.78, 23.5738) projected
  line L1 (-21.6219, 26.8001) -> (-12.9, 18.0782) projected
  point P0 (77.7004, 2.895)
  dimension "d150" = 8.05
sketch "Sketch50" plane through (13.6545, 9.8492, -96.6508) normal (0, 0.7071068, 0.7071068) x (1, 0, 0)
  line L0 (10, 11.828) -> (10, 0) projected
  line L1 (2.63, 11.828) -> (10, 11.828) projected
  line L2 (2.63, 15.3153) -> (2.63, 11.828) projected
  line L3 (0, 15.3153) -> (2.63, 15.3153) projected
  line L4 (0, 0) -> (0, 15.3153) projected
  line L5 (0, 0) -> (10, 0) projected
  line L6 (10, 11.828) -> (2.63, 11.828) projected
  line L7 (2.63, 11.828) -> (10, 11.828)
  line L8 (10, 11.828) -> (10, 0)
  line L9 (10, 0) -> (2.63, 0)
  line L10 (2.63, 0) -> (2.63, 11.828)
  point P0 (-13.6545, -75.3069)
extrude "Extrusion44" add sketch "Sketch50" along normal blind 8.05 contours L0 L5 L10 L1
sketch "Sketch51" plane through (16.2845, 30.6579, -108.1258) normal (-1, 0, 0) x (0, 0, 1)
  line L0 (11.4749, -20.8087) -> (0.6453, -9.9792) projected
  line L1 (11.4749, -20.8087) -> (17.1671, -15.1165) projected
  line L2 (8.0964, -6.0458) -> (17.1671, -15.1165) projected
  line L3 (8.0964, -6.0458) -> (7.0711, -7.0711) projected
  arc A0 (0.6453, -9.9792) -> (7.0711, -7.0711) centre (0, 0) ccw projected
  line L4 (17.4217, -14.862) -> (7.1066, -4.5469)
  line L5 (17.1671, -15.1165) -> (17.4217, -14.862)
  line L6 (8.0964, -6.0458) -> (17.5253, -15.4747) projected
  line L7 (8.0964, -6.0458) -> (8.3509, -5.7912)
  point P0 (108.1258, -30.6579)
  dimension "d153" = 8.41
  dimension "d155" = 0.36
sketch "Sketch53" plane through (23.6545, 15.1832, -90.6004) normal (0, 0.7071068, 0.7071068) x (1, 0, 0)
  line L0 (11.3, 13.3346) -> (11.3, 0) projected
  line L1 (-7.37, 13.3346) -> (-7.37, 0.5066) projected
  line L2 (0, 0.5066) -> (0, 0) projected
  line L3 (11.3, 0) -> (0, 0) projected
  line L4 (11.3, 13.3346) -> (11.3, 0) projected
  line L5 (11.3, 13.3346) -> (-7.37, 13.3346) projected
  line L6 (-7.37, 13.3346) -> (-7.37, 0.5066) projected
  line L7 (-7.37, 0.5066) -> (0, 0.5066) projected
  point P0 (-23.6545, -74.8003)
  point P1 (11.3, 0)
  point P2 (11.3, 13.3346)
  point P3 (-7.37, 13.3346)
  point P4 (-7.37, 0.5066)
  dimension "d154" = 18.67
extrude "Extrusion45" add sketch "Sketch53" along normal blind 0.36
sketch "Sketch54" plane through (23.6545, 15.4378, -90.3459) normal (0, 0.7071068, 0.7071068) x (1, 0, 0)
  line L0 (11.3, 0) -> (11.3, 13.3346) projected
  line L1 (11.3, 13.3346) -> (-7.37, 13.3346) projected
  line L2 (-7.37, 13.3346) -> (-7.37, 0.5066) projected
  line L3 (-7.37, 0.5066) -> (0, 0.5066) projected
  line L4 (0, 0.5066) -> (0, 0) projected
  line L5 (0, 0) -> (11.3, 0) projected
  line L6 (-7.37, 13.3346) -> (11.3, 13.3346) projected
  line L7 (-10, 0.5066) -> (-7.37, 0.5066) projected
  line L8 (-7.37, 13.3346) -> (-9.87, 13.3346)
  line L9 (-9.87, 13.3346) -> (-9.87, 0.5066)
  line L10 (-9.87, 0.5066) -> (-7.37, 0.5066)
  line L11 (-7.37, 0.5066) -> (-7.37, 13.3346)
  point P0 (-23.6545, -74.8003)
  point P1 (-9.87, 6.9206)
  dimension "d158" = 2.5
extrude "Extrusion46" add sketch "Sketch54" along normal blind 3
sketch "Sketch55" plane through (13.6545, -2.895, -77.7004) normal (-1, 0, 0) x (0, 0, 1)
  line L0 (-12.9, 18.0782) -> (-12.9, 13.895) projected
  line L1 (-12.9, 13.895) -> (-1.3395, 13.895)
  line L2 (-1.3395, 13.895) -> (-1.3395, 28.119)
  line L3 (-1.3395, 28.119) -> (-12.9, 28.119)
  line L4 (-12.9, 28.119) -> (-12.9, 13.895)
  point P0 (77.7004, 2.895)
extrude "Extrusion47" cut sketch "Sketch55" against normal blind 100
sketch "Sketch56" plane through (34.9545, -26, -77.7004) normal (0, 0, 1) x (1, 0, 0)
  line L0 (0, 33) -> (0, 0) projected
  line L1 (-11.3, 33) -> (-11.3, 0) projected
  point P0 (-34.9545, 26)
  dimension "d163" = 11.3
sketch "Sketch57" plane through (23.6545, -2.895, -77.7004) normal (-1, 0, 0) x (0, 0, 1)
  line L0 (-12.9, 18.7946) -> (-12.9, 13.895) projected
  line L1 (-12.9, 18.7946) -> (-18.9504, 12.7442) projected
  arc A0 (-13.1386, 3.7758) -> (-18.9504, 12.7442) centre (-37.0407, -5.346) ccw projected
  arc A1 (-12.9, 2.895) -> (-13.1386, 3.7758) centre (-17.4091, 2.1461) ccw projected
  line L2 (-7, 2.895) -> (-12.9, 2.895) projected
  line L3 (-7, -23.105) -> (-7, 2.895) projected
  line L4 (0, -23.105) -> (-7, -23.105) projected
  line L5 (0, 9.895) -> (0, -23.105) projected
  line L6 (-7, 9.895) -> (0, 9.895) projected
  line L7 (-7, 12.895) -> (-7, 9.895) projected
  arc A2 (-7, 12.895) -> (-8, 13.895) centre (-8, 12.895) ccw projected
  line L8 (-12.9, 13.895) -> (-8, 13.895) projected
  line L9 (-12.9, 19.495) -> (-7, 19.495)
  line L10 (-7, 19.495) -> (-7, 15.495)
  line L11 (-7, 15.495) -> (0, 15.495)
  line L12 (0, 15.495) -> (0, 9.895)
  line L13 (-12.9, 18.7946) -> (-12.9, 22.83) projected
  line L14 (-12.9, 19.495) -> (-12.9, 18.7946)
  point P0 (77.7004, 2.895)
  dimension "d164" = 5.6
  dimension "d165" = 5.6
extrude "Extrusion48" add sketch "Sketch57" against normal blind 11.3 contours L13 L9 L10 L11 L12 L6 L7 A2 L8 L0
sketch "Sketch58" plane through (16.2845, 9.8492, -96.6508) normal (0, -0.7071068, 0.7071068) x (1, 0, 0)
  line L0 (7.37, 8.5566) -> (-2.5, 8.5566) projected
  line L1 (-2.5, 8.41) -> (-2.5, 8.5566) projected
  line L2 (-2.5, 8.41) -> (0, 8.41) projected
  line L3 (0, 0) -> (0, 8.41) projected
  line L4 (0, 0) -> (7.37, 0) projected
  line L5 (7.37, 8.5566) -> (7.37, 0) projected
  line L6 (-0.6, 8.5566) -> (7.7317, 8.5566)
  line L7 (7.7317, 8.5566) -> (7.7317, -0.1112)
  line L8 (7.7317, -0.1112) -> (-0.6, -0.1112)
  line L9 (-0.6, -0.1112) -> (-0.6, 8.5566)
  point P0 (-16.2845, 61.378)
  point P1 (7.37, 8.5566)
  dimension "d168" = 0.6
extrude "Extrusion49" add sketch "Sketch58" along normal blind 0.6 contours L5 L4 L3 L2 L9 L0 | L6 L7 L8 L9 L2 L3 L4 L5
chamfer "Chamfer2" distance 0.6 angle 45 1 edges at (19.6695, 15.4753, -90.1762)
sketch "Sketch59" plane through (13.6545, -2.895, -77.7004) normal (-1, 0, 0) x (0, 0, 1)
  arc A0 (-37.4964, 26.4819) -> (-29.78, 23.5738) centre (-30.4253, 33.553) ccw projected
  line L0 (-18.9504, 12.7442) -> (-29.78, 23.5738) projected
  line L1 (-41.0319, 24.3606) -> (-38.2035, 27.189) projected
  line L2 (-28.6868, 12.0154) -> (-41.0319, 24.3606) projected
  line L3 (-38.2035, 27.189) -> (-18.1725, 7.158) projected
  arc A1 (-29.78, 23.5738) -> (-23.3543, 26.4819) centre (-30.4253, 33.553) ccw projected
  line L4 (-29.78, 23.5738) -> (-35.7993, 29.5932)
  line L5 (-38.2035, 27.189) -> (-37.4964, 26.4819) projected
  line L6 (-35.7993, 29.5932) -> (-38.2035, 27.189)
  line L7 (-41.0319, 24.3606) -> (-38.2035, 27.189) projected
  point P0 (77.7004, 2.895)
  dimension "d174" = 4
extrude "Extrusion50" add sketch "Sketch59" against normal blind 21.3
sketch "Sketch60" plane through (13.6545, -2.895, -77.7004) normal (-1, 0, 0) x (0, 0, 1)
  arc A0 (-19.9, -9.1978) -> (-28.6868, 12.0154) centre (-49.9, -9.1978) ccw projected
  line L0 (-28.6868, 12.0154) -> (-41.0319, 24.3606) projected
  line L1 (-41.0319, 24.3606) -> (-38.2035, 27.189) projected
  line L2 (-35.7993, 29.5932) -> (-41.0319, 24.3606) projected
  line L3 (-18.9504, 12.7442) -> (-35.7993, 29.5932) projected
  line L4 (-41.0319, 24.3606) -> (-35.7993, 29.5932) projected
  line L5 (-38.6278, 26.7647) -> (-32.0868, 20.2238)
  line L6 (-19.9, -23.105) -> (-19.9, -9.1978) projected
  arc A1 (-19.9, -9.1978) -> (-32.0868, 20.2238) centre (-61.5083, -9.1978) ccw
  line L7 (-19.9, -23.105) -> (-19.9, -9.1978) projected
  line L8 (-28.6868, 12.0154) -> (-41.0319, 24.3606) projected
  arc A2 (-19.9, -9.1978) -> (-28.6868, 12.0154) centre (-49.9, -9.1978) ccw
  line L9 (-28.6868, 12.0154) -> (-41.0319, 24.3606)
  line L10 (-41.0319, 24.3606) -> (-38.6278, 26.7647)
  point P0 (77.7004, 2.895)
  dimension "d177" = 4
extrude "Extrusion51" cut sketch "Sketch60" against normal blind 21.3
fillet "Fillet12" radius 5 1 edges at (25.6195, 20.6788, -107.4804)
properties part number "MPM_connector_holder_part_1"
